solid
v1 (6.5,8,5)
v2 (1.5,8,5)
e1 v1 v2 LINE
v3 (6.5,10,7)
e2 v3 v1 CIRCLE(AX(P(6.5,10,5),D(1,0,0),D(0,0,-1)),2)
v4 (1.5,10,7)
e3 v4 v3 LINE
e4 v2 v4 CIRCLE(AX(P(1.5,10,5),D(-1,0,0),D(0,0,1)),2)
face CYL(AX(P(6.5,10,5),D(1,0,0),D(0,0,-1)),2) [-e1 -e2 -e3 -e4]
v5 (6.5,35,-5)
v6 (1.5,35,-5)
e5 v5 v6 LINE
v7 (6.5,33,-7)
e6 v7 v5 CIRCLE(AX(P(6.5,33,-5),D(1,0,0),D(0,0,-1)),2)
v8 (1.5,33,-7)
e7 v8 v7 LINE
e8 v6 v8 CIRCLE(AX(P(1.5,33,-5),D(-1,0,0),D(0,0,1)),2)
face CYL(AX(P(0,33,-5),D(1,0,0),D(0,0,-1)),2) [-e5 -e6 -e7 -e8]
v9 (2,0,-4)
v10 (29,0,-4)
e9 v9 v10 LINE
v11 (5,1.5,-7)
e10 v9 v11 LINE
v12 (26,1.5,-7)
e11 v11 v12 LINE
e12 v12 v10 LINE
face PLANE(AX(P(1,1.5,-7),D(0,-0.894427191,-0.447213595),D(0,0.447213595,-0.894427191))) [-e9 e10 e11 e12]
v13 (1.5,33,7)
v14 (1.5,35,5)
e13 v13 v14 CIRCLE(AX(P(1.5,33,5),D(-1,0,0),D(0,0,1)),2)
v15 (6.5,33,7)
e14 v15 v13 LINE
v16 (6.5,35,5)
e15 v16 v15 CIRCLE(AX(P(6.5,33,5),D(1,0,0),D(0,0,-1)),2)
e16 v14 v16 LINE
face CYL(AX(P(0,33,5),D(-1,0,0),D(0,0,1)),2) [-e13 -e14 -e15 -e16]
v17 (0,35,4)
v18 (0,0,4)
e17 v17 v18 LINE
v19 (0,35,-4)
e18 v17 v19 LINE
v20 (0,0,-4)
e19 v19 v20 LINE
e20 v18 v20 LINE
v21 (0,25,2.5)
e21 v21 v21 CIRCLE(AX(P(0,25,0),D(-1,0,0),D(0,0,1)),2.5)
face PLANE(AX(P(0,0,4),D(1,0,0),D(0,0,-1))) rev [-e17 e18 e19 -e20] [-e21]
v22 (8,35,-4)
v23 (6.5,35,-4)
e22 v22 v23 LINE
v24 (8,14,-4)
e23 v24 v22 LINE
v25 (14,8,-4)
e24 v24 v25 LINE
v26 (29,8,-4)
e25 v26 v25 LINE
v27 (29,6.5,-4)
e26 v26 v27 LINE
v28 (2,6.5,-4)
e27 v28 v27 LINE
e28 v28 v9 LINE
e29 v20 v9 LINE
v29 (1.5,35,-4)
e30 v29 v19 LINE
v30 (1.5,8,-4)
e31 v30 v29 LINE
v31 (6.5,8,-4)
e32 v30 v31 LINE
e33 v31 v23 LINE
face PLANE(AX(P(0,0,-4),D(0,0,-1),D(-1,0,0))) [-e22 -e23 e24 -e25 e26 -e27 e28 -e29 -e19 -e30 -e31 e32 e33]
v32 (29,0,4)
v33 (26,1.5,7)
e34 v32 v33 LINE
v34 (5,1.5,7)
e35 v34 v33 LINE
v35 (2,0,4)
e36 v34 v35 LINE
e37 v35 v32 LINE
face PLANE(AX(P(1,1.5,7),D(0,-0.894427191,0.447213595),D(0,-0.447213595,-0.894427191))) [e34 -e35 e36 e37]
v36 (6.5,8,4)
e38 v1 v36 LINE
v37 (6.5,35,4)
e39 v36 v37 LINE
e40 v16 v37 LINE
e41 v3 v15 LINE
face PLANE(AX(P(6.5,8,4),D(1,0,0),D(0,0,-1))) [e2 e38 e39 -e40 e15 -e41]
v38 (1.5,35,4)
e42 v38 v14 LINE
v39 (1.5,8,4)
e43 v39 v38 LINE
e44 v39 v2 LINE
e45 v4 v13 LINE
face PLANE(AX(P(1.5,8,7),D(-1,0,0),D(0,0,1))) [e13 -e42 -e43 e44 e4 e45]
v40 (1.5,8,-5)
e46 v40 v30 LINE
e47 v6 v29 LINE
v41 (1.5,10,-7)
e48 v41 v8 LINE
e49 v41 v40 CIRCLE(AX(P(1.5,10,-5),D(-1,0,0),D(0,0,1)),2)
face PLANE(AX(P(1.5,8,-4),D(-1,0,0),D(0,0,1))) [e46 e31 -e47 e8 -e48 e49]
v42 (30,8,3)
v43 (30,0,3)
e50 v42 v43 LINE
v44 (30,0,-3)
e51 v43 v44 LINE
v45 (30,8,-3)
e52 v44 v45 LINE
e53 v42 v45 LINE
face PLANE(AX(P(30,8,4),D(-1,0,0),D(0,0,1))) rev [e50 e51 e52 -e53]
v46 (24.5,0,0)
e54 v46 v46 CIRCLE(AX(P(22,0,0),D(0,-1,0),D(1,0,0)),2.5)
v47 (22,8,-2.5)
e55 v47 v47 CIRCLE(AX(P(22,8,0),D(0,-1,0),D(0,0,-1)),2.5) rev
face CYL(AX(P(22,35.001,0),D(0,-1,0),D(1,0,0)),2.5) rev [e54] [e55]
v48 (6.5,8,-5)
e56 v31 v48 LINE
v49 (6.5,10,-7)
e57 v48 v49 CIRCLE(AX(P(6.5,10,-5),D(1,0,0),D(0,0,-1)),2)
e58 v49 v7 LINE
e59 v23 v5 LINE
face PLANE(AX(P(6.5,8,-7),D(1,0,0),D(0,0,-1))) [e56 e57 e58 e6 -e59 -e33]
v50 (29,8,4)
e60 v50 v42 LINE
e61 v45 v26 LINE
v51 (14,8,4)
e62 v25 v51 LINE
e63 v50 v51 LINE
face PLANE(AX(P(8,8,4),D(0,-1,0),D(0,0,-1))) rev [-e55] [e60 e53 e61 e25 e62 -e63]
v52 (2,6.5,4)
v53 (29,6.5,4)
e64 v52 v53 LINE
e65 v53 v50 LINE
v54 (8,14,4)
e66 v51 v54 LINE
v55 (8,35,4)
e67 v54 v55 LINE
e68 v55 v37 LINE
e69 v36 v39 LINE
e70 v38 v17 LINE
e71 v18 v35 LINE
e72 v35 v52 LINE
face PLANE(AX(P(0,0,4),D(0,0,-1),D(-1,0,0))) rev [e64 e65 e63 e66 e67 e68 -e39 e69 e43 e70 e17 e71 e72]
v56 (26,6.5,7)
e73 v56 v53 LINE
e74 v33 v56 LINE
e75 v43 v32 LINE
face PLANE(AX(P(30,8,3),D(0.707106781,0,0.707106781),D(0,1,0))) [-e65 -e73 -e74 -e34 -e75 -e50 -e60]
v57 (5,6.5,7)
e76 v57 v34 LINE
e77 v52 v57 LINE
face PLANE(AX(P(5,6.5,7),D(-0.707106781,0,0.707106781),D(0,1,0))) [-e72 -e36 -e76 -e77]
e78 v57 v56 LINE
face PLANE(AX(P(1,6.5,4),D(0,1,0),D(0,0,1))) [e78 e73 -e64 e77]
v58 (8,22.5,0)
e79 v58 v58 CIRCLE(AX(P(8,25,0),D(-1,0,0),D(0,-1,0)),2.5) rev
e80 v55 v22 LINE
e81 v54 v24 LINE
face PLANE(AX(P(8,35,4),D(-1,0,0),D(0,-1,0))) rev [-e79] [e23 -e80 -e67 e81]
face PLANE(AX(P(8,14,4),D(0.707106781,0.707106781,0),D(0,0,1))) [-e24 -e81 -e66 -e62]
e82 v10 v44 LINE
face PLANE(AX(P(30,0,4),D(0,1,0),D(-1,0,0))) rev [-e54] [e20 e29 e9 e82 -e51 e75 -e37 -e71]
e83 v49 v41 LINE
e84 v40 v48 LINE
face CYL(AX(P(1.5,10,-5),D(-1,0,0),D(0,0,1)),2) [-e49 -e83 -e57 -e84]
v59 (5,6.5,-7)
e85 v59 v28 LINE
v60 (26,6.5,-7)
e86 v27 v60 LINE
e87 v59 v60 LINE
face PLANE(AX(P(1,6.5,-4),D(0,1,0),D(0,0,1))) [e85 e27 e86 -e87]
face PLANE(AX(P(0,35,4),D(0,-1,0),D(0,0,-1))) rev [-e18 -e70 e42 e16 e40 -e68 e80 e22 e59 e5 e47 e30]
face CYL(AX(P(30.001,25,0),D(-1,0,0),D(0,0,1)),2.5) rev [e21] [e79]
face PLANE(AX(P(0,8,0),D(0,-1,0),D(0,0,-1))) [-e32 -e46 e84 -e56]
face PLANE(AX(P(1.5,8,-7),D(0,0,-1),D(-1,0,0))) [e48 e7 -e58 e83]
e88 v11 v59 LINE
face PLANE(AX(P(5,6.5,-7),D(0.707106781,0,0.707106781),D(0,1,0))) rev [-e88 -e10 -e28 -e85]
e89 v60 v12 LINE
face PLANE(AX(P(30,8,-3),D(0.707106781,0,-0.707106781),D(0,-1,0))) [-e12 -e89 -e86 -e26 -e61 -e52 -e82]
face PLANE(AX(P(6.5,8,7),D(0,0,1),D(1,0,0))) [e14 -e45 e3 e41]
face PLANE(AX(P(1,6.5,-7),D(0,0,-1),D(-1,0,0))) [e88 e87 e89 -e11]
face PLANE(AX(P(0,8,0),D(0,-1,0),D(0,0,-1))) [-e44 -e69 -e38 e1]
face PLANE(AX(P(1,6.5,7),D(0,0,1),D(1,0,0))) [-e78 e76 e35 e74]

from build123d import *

# Parameters (mm, degrees)
BOSS_EXTRUDE1_DEPTH = 4
BOSS_EXTRUDE2_DEPTH = 29
CHAMFER1_SIZE       = 4
CHAMFER2_SIZE       = 6
CUT_EXTRUDE1_REACH  = 48.626
SKETCH3_R           = 2.5
CUT_EXTRUDE2_REACH  = 48.626
SKETCH4_R           = 2.5
SKETCH5_W           = 5
SKETCH5_H           = 3
BOSS_EXTRUDE3_DEPTH = 27
FILLET1_R           = 2


with BuildPart() as part:
    # Sketch1 → Boss-Extrude1 (new, symmetric)
    with BuildSketch(Plane.XY):
        Polygon((0, 0), (0, 35), (8, 35), (8, 8), (30, 8), (30, 0), align=None)
    extrude(amount=BOSS_EXTRUDE1_DEPTH, both=True)

    # Sketch2 → Boss-Extrude2 (add)
    with BuildSketch(Plane(origin=(30, 0, 0), x_dir=(0, 0, -1), z_dir=(1, 0, 0))):
        Polygon((-4, 6.5), (-7, 6.5), (-7, 1.5), (-4, 0), align=None)
        Polygon((4, 0), (4, 6.5), (7, 6.5), (7, 1.5), align=None)
    extrude(amount=-BOSS_EXTRUDE2_DEPTH)

    # Chamfer1
    # the kernel refuses this chamfer: 4 mm, written as the material it takes off along each edge
    with BuildSketch(Plane(origin=(30, 16.786731952, -7), x_dir=(0.027495876610586487, 0, 0.9996219169112968), z_dir=(0, -1, 0))) as chamfer1_piece_1:
        Polygon((CHAMFER1_SIZE * 0.999621916911, CHAMFER1_SIZE * 0.0274958766106), (-CHAMFER1_SIZE * 0.0274958766106, CHAMFER1_SIZE * 0.999621916911), (0, 0), align=None)
    extrude(amount=25.573463904, mode=Mode.SUBTRACT)
    with BuildSketch(Plane(origin=(1, 16.786731952, -7), x_dir=(-0.02749587661058638, 0, 0.9996219169112968), z_dir=(0, -1, 0))) as chamfer1_piece_2_section:
        Polygon((CHAMFER1_SIZE * 0.999621916911, -CHAMFER1_SIZE * 0.0274958766106), (-CHAMFER1_SIZE * 0.0274958766106, -CHAMFER1_SIZE * 0.999621916911), (0, 0), align=None)
    chamfer1_piece_2 = extrude(amount=25.573463904, mode=Mode.PRIVATE)
    chamfer1_piece_2 = split(chamfer1_piece_2, bisect_by=Plane(origin=(2.407836441, 4, -4), z_dir=(0, 0, -1)), keep=Keep.TOP, mode=Mode.PRIVATE)
    add(chamfer1_piece_2, mode=Mode.SUBTRACT)
    with BuildSketch(Plane(origin=(30, 16.786731952, 7), x_dir=(0.027495876610586487, 0, -0.9996219169112968), z_dir=(0, -1, 0))) as chamfer1_piece_3:
        Polygon((CHAMFER1_SIZE * 0.999621916911, -CHAMFER1_SIZE * 0.0274958766106), (-CHAMFER1_SIZE * 0.0274958766106, -CHAMFER1_SIZE * 0.999621916911), (0, 0), align=None)
    extrude(amount=25.573463904, mode=Mode.SUBTRACT)
    with BuildSketch(Plane(origin=(1, 16.786731952, 7), x_dir=(-0.02749587661058638, 0, -0.9996219169112968), z_dir=(0, -1, 0))) as chamfer1_piece_4_section:
        Polygon((CHAMFER1_SIZE * 0.999621916911, CHAMFER1_SIZE * 0.0274958766106), (-CHAMFER1_SIZE * 0.0274958766106, CHAMFER1_SIZE * 0.999621916911), (0, 0), align=None)
    chamfer1_piece_4 = extrude(amount=25.573463904, mode=Mode.PRIVATE)
    chamfer1_piece_4 = split(chamfer1_piece_4, bisect_by=Plane(origin=(2.407836441, 4, 4), z_dir=(0, 0, 1)), keep=Keep.TOP, mode=Mode.PRIVATE)
    add(chamfer1_piece_4, mode=Mode.SUBTRACT)

    # Chamfer2
    chamfer2_edges = [part.edges().sort_by_distance(p)[0] for p in [
        (8, 8, 0),
    ]]
    chamfer(chamfer2_edges, length=CHAMFER2_SIZE)

    # Sketch3 → Cut-Extrude1 (cut, up to next)
    with BuildSketch(Plane.XZ, mode=Mode.PRIVATE) as cut_extrude1_sk1:
        with Locations((22, 0)):
            Circle(SKETCH3_R)
    cut_extrude1_tool1 = extrude(cut_extrude1_sk1.sketch, amount=-CUT_EXTRUDE1_REACH, mode=Mode.PRIVATE) & part.part
    add(cut_extrude1_tool1.solids().sort_by_distance((22, 0, 0))[0], mode=Mode.SUBTRACT)

    # Sketch4 → Cut-Extrude2 (cut, up to next)
    with BuildSketch(Plane.ZY, mode=Mode.PRIVATE) as cut_extrude2_sk1:
        with Locations((0, 25)):
            Circle(SKETCH4_R)
    cut_extrude2_tool1 = extrude(cut_extrude2_sk1.sketch, amount=-CUT_EXTRUDE2_REACH, mode=Mode.PRIVATE) & part.part
    add(cut_extrude2_tool1.solids().sort_by_distance((0, 25, 0))[0], mode=Mode.SUBTRACT)

    # Sketch5 → Boss-Extrude3 (add)
    with BuildSketch(Plane(origin=(0, 35, 0), x_dir=(1, 0, 0), z_dir=(0, 1, 0))):
        with Locations((4, 5.5)):
            Rectangle(SKETCH5_W, SKETCH5_H)
        with Locations((4, -5.5)):
            Rectangle(SKETCH5_W, SKETCH5_H)
    extrude(amount=-BOSS_EXTRUDE3_DEPTH)

    # Fillet1
    fillet1_edges = [part.edges().sort_by_distance(p)[0] for p in [
        (4, 8, -7),
        (4, 35, -7),
        (4, 8, 7),
        (4, 35, 7),
    ]]
    fillet(fillet1_edges, radius=FILLET1_R)


solid = part.part
